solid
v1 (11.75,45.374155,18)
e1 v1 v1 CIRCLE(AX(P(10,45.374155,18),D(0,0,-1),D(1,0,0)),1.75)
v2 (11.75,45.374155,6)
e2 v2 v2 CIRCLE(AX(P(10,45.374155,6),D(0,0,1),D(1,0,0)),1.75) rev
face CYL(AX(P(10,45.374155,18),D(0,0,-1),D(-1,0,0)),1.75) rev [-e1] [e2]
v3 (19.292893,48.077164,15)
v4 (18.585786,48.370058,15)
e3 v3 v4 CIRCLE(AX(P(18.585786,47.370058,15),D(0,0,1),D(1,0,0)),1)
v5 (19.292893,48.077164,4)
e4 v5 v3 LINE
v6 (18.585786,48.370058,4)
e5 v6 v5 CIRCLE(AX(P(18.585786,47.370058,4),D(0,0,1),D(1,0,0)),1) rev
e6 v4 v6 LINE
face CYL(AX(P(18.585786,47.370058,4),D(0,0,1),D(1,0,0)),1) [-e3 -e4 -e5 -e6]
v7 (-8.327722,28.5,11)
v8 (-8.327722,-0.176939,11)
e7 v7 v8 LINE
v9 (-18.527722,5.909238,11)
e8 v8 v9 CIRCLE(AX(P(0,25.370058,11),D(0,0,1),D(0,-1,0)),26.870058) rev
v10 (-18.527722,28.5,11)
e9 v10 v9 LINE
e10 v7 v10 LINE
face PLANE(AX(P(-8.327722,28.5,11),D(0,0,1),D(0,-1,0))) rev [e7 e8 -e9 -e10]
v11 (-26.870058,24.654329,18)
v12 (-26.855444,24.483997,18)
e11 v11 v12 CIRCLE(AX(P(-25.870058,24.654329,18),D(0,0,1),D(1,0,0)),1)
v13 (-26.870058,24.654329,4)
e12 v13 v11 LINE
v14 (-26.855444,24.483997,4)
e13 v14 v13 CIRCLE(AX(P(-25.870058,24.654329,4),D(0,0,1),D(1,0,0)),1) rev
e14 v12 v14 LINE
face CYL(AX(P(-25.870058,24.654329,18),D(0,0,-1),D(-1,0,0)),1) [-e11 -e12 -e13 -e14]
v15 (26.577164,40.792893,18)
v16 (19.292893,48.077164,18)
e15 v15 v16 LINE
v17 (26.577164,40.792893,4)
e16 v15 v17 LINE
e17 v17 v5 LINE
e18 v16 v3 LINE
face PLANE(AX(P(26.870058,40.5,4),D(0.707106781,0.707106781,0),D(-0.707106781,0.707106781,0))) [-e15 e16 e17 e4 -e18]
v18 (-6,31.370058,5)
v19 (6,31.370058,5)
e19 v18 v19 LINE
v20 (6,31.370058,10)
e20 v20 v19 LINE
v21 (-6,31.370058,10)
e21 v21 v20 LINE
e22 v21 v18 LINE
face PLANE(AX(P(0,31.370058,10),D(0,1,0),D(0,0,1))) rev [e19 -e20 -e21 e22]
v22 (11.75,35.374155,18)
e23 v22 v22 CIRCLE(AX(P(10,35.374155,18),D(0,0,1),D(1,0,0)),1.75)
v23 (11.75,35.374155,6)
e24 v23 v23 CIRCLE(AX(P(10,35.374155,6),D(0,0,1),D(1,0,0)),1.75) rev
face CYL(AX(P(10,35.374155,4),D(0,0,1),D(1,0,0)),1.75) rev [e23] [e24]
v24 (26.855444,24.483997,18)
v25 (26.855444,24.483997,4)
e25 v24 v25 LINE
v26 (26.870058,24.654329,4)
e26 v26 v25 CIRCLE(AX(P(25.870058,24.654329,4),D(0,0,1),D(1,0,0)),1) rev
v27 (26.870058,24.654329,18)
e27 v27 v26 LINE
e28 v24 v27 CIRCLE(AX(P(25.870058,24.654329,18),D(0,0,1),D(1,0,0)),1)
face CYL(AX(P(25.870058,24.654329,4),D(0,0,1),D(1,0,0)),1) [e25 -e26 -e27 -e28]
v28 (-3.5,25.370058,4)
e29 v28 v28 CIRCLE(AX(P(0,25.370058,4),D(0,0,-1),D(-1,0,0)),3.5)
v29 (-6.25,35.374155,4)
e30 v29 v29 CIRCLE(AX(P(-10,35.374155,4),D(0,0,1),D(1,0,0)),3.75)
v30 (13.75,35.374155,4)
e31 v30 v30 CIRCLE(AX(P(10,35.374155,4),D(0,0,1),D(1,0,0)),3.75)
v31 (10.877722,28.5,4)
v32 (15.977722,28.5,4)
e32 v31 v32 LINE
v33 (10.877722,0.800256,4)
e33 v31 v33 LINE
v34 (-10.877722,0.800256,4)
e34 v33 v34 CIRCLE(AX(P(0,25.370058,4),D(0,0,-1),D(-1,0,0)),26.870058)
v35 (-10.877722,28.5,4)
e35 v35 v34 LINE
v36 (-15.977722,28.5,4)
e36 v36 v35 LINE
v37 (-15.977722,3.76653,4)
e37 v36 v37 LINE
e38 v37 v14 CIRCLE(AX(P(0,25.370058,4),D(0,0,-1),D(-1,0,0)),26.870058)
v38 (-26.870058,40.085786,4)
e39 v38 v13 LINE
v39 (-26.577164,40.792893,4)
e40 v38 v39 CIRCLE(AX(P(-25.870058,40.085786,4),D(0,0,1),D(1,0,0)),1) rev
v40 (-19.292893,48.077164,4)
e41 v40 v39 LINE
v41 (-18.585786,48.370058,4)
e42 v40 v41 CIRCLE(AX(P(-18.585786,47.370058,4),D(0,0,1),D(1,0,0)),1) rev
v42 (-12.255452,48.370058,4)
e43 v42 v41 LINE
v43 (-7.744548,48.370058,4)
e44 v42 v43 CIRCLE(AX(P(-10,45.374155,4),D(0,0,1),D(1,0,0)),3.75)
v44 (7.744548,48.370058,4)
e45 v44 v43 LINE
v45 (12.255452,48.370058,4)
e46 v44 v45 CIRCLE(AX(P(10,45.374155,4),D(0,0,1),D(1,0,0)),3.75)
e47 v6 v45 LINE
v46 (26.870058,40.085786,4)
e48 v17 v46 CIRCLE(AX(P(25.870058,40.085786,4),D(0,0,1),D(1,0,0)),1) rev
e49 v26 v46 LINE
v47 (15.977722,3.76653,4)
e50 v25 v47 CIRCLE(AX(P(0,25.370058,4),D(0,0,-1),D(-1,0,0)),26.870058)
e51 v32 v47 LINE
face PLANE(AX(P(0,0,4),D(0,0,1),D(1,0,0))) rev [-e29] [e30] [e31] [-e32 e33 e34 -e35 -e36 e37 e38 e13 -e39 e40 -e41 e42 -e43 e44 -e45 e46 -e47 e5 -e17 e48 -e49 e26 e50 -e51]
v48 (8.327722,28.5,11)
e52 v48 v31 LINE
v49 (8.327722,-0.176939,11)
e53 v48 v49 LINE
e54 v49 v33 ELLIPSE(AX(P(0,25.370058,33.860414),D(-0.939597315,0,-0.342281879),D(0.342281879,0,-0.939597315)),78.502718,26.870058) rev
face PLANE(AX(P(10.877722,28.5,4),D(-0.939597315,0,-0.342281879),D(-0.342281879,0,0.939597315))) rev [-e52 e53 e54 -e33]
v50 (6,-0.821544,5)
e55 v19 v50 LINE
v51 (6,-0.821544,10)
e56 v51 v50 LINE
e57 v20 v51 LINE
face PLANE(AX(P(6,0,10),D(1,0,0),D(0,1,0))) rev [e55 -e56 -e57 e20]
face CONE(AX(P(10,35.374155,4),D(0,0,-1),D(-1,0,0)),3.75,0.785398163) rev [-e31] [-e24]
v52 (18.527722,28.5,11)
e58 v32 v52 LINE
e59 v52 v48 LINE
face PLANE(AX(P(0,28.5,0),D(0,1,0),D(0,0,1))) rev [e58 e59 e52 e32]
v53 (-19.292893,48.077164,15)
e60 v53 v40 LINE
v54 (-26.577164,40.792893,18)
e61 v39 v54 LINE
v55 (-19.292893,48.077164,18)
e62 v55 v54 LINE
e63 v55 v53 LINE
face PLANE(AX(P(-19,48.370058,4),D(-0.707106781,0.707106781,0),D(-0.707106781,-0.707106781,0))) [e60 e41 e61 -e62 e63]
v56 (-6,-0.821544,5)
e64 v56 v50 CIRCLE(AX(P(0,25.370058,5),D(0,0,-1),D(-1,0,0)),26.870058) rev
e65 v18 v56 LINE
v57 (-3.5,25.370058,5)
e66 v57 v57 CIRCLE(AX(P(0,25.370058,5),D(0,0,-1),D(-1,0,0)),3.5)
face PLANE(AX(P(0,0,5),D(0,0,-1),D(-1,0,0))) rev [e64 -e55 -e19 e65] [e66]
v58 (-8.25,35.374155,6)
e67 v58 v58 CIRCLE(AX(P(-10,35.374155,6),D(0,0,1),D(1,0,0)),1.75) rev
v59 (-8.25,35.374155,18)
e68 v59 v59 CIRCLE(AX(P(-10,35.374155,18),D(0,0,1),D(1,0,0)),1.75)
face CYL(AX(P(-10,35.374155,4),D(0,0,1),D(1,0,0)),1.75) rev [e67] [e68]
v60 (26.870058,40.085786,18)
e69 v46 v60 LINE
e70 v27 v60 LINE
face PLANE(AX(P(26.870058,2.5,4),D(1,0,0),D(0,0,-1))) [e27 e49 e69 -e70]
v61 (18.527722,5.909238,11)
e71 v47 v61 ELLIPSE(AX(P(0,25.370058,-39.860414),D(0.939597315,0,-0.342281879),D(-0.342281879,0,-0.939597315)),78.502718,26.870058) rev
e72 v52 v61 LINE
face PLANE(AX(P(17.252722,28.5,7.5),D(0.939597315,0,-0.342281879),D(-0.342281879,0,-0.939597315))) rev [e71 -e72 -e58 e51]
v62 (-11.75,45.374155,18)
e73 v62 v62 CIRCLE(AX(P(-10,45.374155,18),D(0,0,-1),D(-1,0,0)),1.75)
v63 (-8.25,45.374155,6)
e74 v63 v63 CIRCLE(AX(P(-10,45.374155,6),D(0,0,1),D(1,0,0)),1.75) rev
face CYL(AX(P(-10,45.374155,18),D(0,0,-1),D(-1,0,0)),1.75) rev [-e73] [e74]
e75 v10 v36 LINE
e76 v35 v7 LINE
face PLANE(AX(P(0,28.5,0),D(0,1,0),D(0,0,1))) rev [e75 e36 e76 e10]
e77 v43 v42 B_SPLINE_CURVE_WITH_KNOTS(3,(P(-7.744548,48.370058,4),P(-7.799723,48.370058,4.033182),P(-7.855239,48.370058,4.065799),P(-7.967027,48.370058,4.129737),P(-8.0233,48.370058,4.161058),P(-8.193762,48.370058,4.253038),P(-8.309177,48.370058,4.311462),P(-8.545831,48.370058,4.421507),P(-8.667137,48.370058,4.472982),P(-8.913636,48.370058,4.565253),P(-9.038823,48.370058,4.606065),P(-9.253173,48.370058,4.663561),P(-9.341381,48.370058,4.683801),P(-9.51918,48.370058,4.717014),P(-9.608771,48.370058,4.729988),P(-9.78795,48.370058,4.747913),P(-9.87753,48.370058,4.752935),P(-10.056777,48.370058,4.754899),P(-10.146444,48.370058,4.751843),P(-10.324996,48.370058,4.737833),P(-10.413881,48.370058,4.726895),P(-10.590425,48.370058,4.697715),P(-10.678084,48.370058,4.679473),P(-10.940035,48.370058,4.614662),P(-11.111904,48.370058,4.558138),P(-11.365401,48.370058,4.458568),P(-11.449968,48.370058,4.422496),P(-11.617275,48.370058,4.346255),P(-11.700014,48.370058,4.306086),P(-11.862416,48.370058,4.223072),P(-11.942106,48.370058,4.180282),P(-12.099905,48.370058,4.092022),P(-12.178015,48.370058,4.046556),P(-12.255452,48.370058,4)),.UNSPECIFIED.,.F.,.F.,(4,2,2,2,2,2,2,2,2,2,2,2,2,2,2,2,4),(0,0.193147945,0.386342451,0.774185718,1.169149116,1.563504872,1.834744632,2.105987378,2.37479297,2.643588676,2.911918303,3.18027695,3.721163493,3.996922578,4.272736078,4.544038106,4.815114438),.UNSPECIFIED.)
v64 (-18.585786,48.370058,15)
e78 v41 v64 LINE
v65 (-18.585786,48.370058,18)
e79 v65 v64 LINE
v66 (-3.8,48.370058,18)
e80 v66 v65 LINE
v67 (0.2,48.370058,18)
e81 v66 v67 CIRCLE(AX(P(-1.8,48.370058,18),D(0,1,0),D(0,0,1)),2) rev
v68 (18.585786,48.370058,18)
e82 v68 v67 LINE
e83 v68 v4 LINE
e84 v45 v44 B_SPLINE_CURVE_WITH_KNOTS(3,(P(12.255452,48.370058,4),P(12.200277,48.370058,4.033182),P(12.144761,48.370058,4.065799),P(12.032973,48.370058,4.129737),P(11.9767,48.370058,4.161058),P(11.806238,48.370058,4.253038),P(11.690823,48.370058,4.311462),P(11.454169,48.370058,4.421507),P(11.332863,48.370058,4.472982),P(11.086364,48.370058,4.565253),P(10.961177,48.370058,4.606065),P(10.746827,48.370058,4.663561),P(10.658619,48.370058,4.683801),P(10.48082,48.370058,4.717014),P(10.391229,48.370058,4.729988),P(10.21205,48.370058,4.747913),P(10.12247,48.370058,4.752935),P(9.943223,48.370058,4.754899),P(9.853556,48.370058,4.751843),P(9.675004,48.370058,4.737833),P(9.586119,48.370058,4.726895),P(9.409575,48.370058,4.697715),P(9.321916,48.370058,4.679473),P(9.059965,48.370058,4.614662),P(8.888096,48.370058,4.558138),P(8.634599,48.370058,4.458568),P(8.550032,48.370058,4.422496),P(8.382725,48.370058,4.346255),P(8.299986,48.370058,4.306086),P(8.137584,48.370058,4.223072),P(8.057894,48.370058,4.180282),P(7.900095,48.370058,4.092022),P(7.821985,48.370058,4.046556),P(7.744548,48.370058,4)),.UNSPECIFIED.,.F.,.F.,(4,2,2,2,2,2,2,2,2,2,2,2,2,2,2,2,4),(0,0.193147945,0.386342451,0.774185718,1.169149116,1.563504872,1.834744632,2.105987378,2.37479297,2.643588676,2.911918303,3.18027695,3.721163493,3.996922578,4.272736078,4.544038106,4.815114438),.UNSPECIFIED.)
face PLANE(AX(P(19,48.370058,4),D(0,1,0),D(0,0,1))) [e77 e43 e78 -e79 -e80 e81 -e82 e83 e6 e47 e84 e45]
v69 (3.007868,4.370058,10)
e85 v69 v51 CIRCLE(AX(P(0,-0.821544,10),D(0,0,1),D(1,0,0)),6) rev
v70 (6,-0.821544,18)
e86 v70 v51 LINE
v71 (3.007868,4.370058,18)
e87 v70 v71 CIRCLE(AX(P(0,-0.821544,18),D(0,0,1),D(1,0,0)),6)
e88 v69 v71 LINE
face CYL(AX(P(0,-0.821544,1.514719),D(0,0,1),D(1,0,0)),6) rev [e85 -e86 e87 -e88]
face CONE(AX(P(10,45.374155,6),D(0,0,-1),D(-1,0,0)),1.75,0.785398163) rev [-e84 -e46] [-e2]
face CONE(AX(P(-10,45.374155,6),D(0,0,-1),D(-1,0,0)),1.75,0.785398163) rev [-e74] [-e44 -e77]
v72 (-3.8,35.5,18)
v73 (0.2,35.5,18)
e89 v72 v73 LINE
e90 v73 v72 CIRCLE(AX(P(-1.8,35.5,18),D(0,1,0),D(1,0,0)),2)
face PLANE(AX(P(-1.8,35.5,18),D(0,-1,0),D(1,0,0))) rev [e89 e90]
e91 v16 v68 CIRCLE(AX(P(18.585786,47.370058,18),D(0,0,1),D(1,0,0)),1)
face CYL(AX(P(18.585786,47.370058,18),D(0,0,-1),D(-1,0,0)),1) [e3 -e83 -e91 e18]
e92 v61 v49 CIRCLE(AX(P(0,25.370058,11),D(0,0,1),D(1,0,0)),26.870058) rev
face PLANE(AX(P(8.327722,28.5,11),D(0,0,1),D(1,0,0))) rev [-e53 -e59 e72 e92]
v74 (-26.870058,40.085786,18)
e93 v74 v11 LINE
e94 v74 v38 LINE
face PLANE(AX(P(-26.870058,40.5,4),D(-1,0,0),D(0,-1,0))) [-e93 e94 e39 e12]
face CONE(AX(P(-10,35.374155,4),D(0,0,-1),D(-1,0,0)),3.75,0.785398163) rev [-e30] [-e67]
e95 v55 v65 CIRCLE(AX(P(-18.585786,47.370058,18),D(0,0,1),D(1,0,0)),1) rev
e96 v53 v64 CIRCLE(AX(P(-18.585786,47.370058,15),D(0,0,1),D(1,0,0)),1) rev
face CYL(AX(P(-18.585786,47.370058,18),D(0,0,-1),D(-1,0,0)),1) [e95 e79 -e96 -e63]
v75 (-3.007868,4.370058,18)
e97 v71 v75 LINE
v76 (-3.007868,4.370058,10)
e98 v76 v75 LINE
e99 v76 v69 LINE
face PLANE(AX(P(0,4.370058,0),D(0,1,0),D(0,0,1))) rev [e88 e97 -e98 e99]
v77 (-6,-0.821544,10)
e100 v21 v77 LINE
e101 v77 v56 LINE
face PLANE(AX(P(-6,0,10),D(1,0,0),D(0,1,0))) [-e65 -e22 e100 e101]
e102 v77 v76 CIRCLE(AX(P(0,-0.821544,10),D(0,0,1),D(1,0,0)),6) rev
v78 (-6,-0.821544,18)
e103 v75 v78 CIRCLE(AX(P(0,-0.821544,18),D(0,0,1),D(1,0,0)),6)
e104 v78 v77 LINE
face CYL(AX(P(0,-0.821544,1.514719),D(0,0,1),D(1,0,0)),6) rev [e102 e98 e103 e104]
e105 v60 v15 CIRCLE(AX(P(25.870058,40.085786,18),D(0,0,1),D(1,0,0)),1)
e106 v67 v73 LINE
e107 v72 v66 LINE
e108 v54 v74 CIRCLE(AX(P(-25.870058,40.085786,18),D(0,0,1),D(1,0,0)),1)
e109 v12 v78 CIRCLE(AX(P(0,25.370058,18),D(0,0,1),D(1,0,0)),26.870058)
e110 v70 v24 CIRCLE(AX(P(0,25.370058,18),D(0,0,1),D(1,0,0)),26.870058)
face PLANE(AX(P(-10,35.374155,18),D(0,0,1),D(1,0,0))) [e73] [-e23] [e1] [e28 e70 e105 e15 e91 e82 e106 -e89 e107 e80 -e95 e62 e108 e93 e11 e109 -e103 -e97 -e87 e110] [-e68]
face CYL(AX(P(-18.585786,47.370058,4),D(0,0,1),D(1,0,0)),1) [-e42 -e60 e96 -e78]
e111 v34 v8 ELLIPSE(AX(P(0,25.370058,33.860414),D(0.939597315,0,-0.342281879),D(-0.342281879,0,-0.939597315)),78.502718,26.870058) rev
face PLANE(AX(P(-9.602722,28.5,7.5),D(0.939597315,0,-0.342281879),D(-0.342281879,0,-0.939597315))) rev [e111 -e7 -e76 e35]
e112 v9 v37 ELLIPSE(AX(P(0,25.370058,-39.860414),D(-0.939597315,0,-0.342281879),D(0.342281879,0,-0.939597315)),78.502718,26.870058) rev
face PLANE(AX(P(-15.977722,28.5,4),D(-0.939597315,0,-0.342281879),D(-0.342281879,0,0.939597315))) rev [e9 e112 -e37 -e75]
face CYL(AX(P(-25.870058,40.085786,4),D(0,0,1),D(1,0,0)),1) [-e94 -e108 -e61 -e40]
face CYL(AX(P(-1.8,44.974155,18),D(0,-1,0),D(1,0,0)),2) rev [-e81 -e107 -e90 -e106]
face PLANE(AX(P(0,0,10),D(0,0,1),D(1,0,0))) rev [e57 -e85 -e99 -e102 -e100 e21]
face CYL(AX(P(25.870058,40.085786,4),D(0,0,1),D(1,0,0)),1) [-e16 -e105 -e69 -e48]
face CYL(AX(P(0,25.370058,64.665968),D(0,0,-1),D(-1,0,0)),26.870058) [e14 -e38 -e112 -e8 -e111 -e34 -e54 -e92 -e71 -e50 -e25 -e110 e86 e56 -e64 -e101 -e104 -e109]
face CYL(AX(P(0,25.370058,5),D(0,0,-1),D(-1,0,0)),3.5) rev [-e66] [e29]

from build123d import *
from build123d.topology import SkipClean

# Parameters (mm, degrees)
CROQUIS3_W                   = 38
CROQUIS3_H                   = 38
SALIENTE_EXTRUIR9_DEPTH      = 1
SALIENTE_EXTRUIR10_START     = -11
SALIENTE_EXTRUIR10_OUTLINE_W = 38
SALIENTE_EXTRUIR10_OUTLINE_H = 38
SALIENTE_EXTRUIR10_DEPTH     = 10
CROQUIS13_W                  = 38
CROQUIS13_H                  = 38
SALIENTE_EXTRUIR15_DEPTH     = 3
CROQUIS14_R                  = 1.75
CORTAR_EXTRUIR1_DEPTH        = 14
CROQUIS15_W                  = 38
CROQUIS15_H                  = 24.129942315
CROQUIS15_R                  = 3.5
SALIENTE_EXTRUIR16_DEPTH     = 1
CORTAR_EXTRUIR2_DEPTH        = 14
SALIENTE_EXTRUIR17_DEPTH     = 5
SALIENTE_EXTRUIR18_DEPTH     = 5
CORTAR_EXTRUIR3_DEPTH        = 3
REDONDEO11_R                 = 1
CROQUIS21_R                  = 1.75
CORTAR_EXTRUIR4_DEPTH        = 11
SALIENTE_EXTRUIR20_START     = 3
CROQUIS22_R                  = 3
CROQUIS22_R_2                = 1.75
SALIENTE_EXTRUIR20_DEPTH     = 3
CHAFL_N1_SIZE                = 2
REDONDEO13_R                 = 1
SALIENTE_EXTRUIR22_DEPTH     = 3
REDONDEO14_R                 = 5
SALIENTE_EXTRUIR25_DEPTH     = 1
SALIENTE_EXTRUIR26_DEPTH     = 13
CROQUIS30_W                  = 12
CROQUIS30_H                  = 8
SALIENTE_EXTRUIR27_DEPTH     = 15
SALIENTE_EXTRUIR28_DEPTH     = 8
CORTAR_EXTRUIR5_DEPTH        = 30
CROQUIS35_R                  = 3
SALIENTE_EXTRUIR29_DEPTH     = 3
CORTAR_EXTRUIR6_DEPTH        = 5


# Read off the part's stored shape, not the designer's step: Saliente-Extruir10
with BuildPart() as part:
    # Croquis3 → Saliente-Extruir9 (new body)
    with BuildSketch(Plane.XY.offset(5)):
        Polygon((19, -5.370057685), (26.870057685, 2.5), (26.870057685, 40.5), (19, 48.370057685), (-19, 48.370057685), (-26.870057685, 40.5), (-26.870057685, 2.5), (-19, -5.370057685), align=None)
        with Locations((0, 21.5)):
            Rectangle(CROQUIS3_W, CROQUIS3_H, mode=Mode.SUBTRACT)
    extrude(amount=-SALIENTE_EXTRUIR9_DEPTH)

    # Saliente-Extruir10 outline → Saliente-Extruir10 (add)
    with BuildSketch(Plane(origin=(0, 0, 4), x_dir=(-1, 0, 0), z_dir=(0, 0, -1)).offset(SALIENTE_EXTRUIR10_START)):
        Polygon((-26.870057685, 2.5), (-19, -5.370057685), (19, -5.370057685), (26.870057685, 2.5), (26.870057685, 40.5), (19, 48.370057685), (-19, 48.370057685), (-26.870057685, 40.5), align=None)
        with Locations((0, 21.5)):
            Rectangle(SALIENTE_EXTRUIR10_OUTLINE_W, SALIENTE_EXTRUIR10_OUTLINE_H, mode=Mode.SUBTRACT)
    extrude(amount=SALIENTE_EXTRUIR10_DEPTH)

    # Croquis13 → Saliente-Extruir15 (add)
    with BuildSketch(Plane.XY.offset(15)):
        with BuildLine():
            Line((-22.5, 44.870057685), (-22.5, -1))
            Line((-22.5, -1), (22.5, -1))
            Line((22.5, -1), (22.5, 44.870057685))
            Line((22.5, 44.870057685), (19.292893219, 48.077164466))
            ThreePointArc((19.292893219, 48.077164466), (18.96846987, 48.293937218), (18.585786438, 48.370057685))
            Line((18.585786438, 48.370057685), (-18.585786438, 48.370057685))
            ThreePointArc((-18.585786438, 48.370057685), (-18.96846987, 48.293937218), (-19.292893219, 48.077164466))
            Line((-19.292893219, 48.077164466), (-22.5, 44.870057685))
        make_face()
        with Locations((0, 21.5)):
            Rectangle(CROQUIS13_W, CROQUIS13_H, mode=Mode.SUBTRACT)
    extrude(amount=SALIENTE_EXTRUIR15_DEPTH)

    # Croquis14 → Cortar-Extruir1 (cut)
    with BuildSketch(Plane(origin=(0, 0, 4), x_dir=(-1, 0, 0), z_dir=(0, 0, -1))):
        with Locations((10, 45.37415474)):
            Circle(CROQUIS14_R)
        with Locations(Location((-10, 45.37415474, 0), (0, 0, 180))):
            Circle(CROQUIS14_R)
    extrude(amount=-CORTAR_EXTRUIR1_DEPTH, mode=Mode.SUBTRACT)

    # Croquis15 → Saliente-Extruir16 (add)
    with BuildSketch(Plane(origin=(0, 0, 4), x_dir=(-1, 0, 0), z_dir=(0, 0, -1))):
        with Locations((0, 28.435028843)):
            Rectangle(CROQUIS15_W, CROQUIS15_H)
        with Locations((0, 25.370057685)):
            Circle(CROQUIS15_R, mode=Mode.SUBTRACT)
    extrude(amount=-SALIENTE_EXTRUIR16_DEPTH)

    # Croquis16 → Cortar-Extruir2 (cut)
    with BuildSketch(Plane(origin=(0, 0, 4), x_dir=(-1, 0, 0), z_dir=(0, 0, -1))):
        Polygon((-19, 2.5), (-19, 16.370057685), (-26.870057685, 24.24011537), (-26.870057685, 2.5), (-19, -5.370057685), (19, -5.370057685), (26.870057685, 2.5), (26.870057685, 24.24011537), (19, 16.370057685), (19, 2.5), align=None)
    extrude(amount=-CORTAR_EXTRUIR2_DEPTH, mode=Mode.SUBTRACT)

    # Croquis17 → Saliente-Extruir17 (add)
    with BuildSketch(Plane.XY.offset(5)):
        Polygon((6, 31.370057685), (6, 25.370057685), (6, 19.370057685), (6, 16.370057685), (19, 16.370057685), (19, 40.5), (-19, 40.5), (-19, 16.370057685), (-6, 16.370057685), (-6, 19.370057685), (-6, 31.370057685), align=None)
    extrude(amount=SALIENTE_EXTRUIR17_DEPTH)

    # Croquis18 → Saliente-Extruir18 (add)
    with BuildSketch(Plane.XY.offset(10)):
        Polygon((-19, 40.5), (-19, 16.370057685), (-6, 16.370057685), (-6, 19.370057685), (6, 19.370057685), (6, 16.370057685), (19, 16.370057685), (19, 40.5), align=None)
    extrude(amount=SALIENTE_EXTRUIR18_DEPTH)

    # Croquis19 → Cortar-Extruir3 (cut)
    with BuildSketch(Plane.XY.offset(18)):
        Polygon((-22.5, 19.870057685), (-19, 16.370057685), (-19, 21.370057685), (-22.5, 21.370057685), align=None)
        Polygon((19, 16.370057685), (22.5, 19.870057685), (22.5, 21.370057685), (19, 21.370057685), align=None)
    extrude(amount=-CORTAR_EXTRUIR3_DEPTH, mode=Mode.SUBTRACT)

    # Redondeo11
    redondeo11_edges = [part.edges().sort_by_distance(p)[0] for p in [
        (26.870057685, 40.5, 10),
        (19, 48.370057685, 10),
        (-19, 48.370057685, 10),
        (-26.870057685, 40.5, 10),
        (26.870057685, 24.24011537, 9.5),
        (19, 16.370057685, 9.5),
        (-26.870057685, 24.24011537, 9.5),
        (-19, 16.370057685, 9.5),
    ]]
    fillet(redondeo11_edges, radius=REDONDEO11_R)

    # Croquis21 → Cortar-Extruir4 (cut)
    with BuildSketch(Plane.XY.offset(15)):
        with Locations((-10, 35.37415474)):
            Circle(CROQUIS21_R)
        with Locations((10, 35.37415474)):
            Circle(CROQUIS21_R)
    extrude(amount=-CORTAR_EXTRUIR4_DEPTH, mode=Mode.SUBTRACT)

    # Croquis22 → Saliente-Extruir20 (add)
    # profile 1 of 2: a face of its own
    with BuildSketch(Plane.XY.offset(15).offset(SALIENTE_EXTRUIR20_START)):
        with Locations(Location((-10, 35.37415474, 0), (0, 0, 180))):
            Circle(CROQUIS22_R)
        with Locations((-10, 35.37415474)):
            Circle(CROQUIS22_R_2, mode=Mode.SUBTRACT)
    # profile 2 of 2: a face of its own
    with BuildSketch(Plane.XY.offset(15).offset(SALIENTE_EXTRUIR20_START)):
        with Locations(Location((10, 35.37415474, 0), (0, 0, 180))):
            Circle(CROQUIS22_R)
        with Locations((10, 35.37415474)):
            Circle(CROQUIS22_R_2, mode=Mode.SUBTRACT)
    extrude(amount=-SALIENTE_EXTRUIR20_DEPTH)

    # Croquis23 → Cortar-Revolución1 (revolve, cut)
    with BuildSketch(Plane.XY.offset(18)):
        Polygon((-1.8, 48.370057685), (-1.8, 44.97415474), (-1.8, 40.5), (0.2, 40.5), (0.2, 48.370057685), align=None)
    revolve(axis=Axis((-1.8, 44.97415474, 18), (0, 1, 0)), mode=Mode.SUBTRACT)

    # Chaflán1
    # the kernel refuses this chamfer: 2 mm, written as the material it takes off along each edge
    with BuildSketch(Plane(origin=(-10, 45.37415474, 4), x_dir=(-1, 0, 0), z_dir=(0, -1, 0))) as chafl_n1_piece_1:
        Polygon((1.75 + CHAFL_N1_SIZE, 0), (1.75, -CHAFL_N1_SIZE), (1.75, 0), align=None)
    revolve(axis=Axis((-10, 45.37415474, 4), (0, 0, -1)), mode=Mode.SUBTRACT)
    with BuildSketch(Plane(origin=(10, 45.37415474, 4), x_dir=(1, 0, 0), z_dir=(0, 1, 0))) as chafl_n1_piece_2:
        Polygon((1.75 + CHAFL_N1_SIZE, 0), (1.75, -CHAFL_N1_SIZE), (1.75, 0), align=None)
    revolve(axis=Axis((10, 45.37415474, 4), (0, 0, -1)), mode=Mode.SUBTRACT)
    with BuildSketch(Plane(origin=(-10, 35.37415474, 4), x_dir=(1, 0, 0), z_dir=(0, -1, 0))) as chafl_n1_piece_3:
        Polygon((1.75 + CHAFL_N1_SIZE, 0), (1.75, CHAFL_N1_SIZE), (1.75, 0), align=None)
    revolve(axis=Axis((-10, 35.37415474, 4), (0, 0, 1)), mode=Mode.SUBTRACT)
    with BuildSketch(Plane(origin=(10, 35.37415474, 4), x_dir=(1, 0, 0), z_dir=(0, -1, 0))) as chafl_n1_piece_4:
        Polygon((1.75 + CHAFL_N1_SIZE, 0), (1.75, CHAFL_N1_SIZE), (1.75, 0), align=None)
    revolve(axis=Axis((10, 35.37415474, 4), (0, 0, 1)), mode=Mode.SUBTRACT)

    # Redondeo13
    redondeo13_edges = [part.edges().sort_by_distance(p)[0] for p in [
        (22.5, 21.370057685, 16.5),
        (19, 21.370057685, 16.5),
        (-19, 21.370057685, 16.5),
        (-22.5, 21.370057685, 16.5),
    ]]
    fillet(redondeo13_edges, radius=REDONDEO13_R)

    # Croquis26 → Saliente-Extruir22 (add)
    with BuildSketch(Plane.XY.offset(15)):
        with BuildLine():
            Line((19, 22.370057685), (-19, 22.370057685))
            ThreePointArc((-19, 22.370057685), (-19.292893219, 21.662950904), (-20, 21.370057685))
            Line((-20, 21.370057685), (-21.5, 21.370057685))
            ThreePointArc((-21.5, 21.370057685), (-22.207106781, 21.662950904), (-22.5, 22.370057685))
            Line((-22.5, 22.370057685), (-22.5, 44.870057685))
            Line((-22.5, 44.870057685), (-26.577164466, 40.792893219))
            ThreePointArc((-26.577164466, 40.792893219), (-26.793937218, 40.46846987), (-26.870057685, 40.085786438))
            Line((-26.870057685, 40.085786438), (-26.870057685, 24.654328933))
            ThreePointArc((-26.870057685, 24.654328933), (-26.793937218, 24.2716455), (-26.577164466, 23.947222151))
            Line((-26.577164466, 23.947222151), (-19.292893219, 16.662950904))
            ThreePointArc((-19.292893219, 16.662950904), (-18.96846987, 16.446178153), (-18.585786438, 16.370057685))
            Line((-18.585786438, 16.370057685), (-6, 16.370057685))
            Line((-6, 16.370057685), (-6, 19.370057685))
            Line((-6, 19.370057685), (6, 19.370057685))
            Line((6, 19.370057685), (6, 16.370057685))
            Line((6, 16.370057685), (18.585786438, 16.370057685))
            ThreePointArc((18.585786438, 16.370057685), (18.96846987, 16.446178153), (19.292893219, 16.662950904))
            Line((19.292893219, 16.662950904), (26.577164466, 23.947222151))
            ThreePointArc((26.577164466, 23.947222151), (26.793937218, 24.2716455), (26.870057685, 24.654328933))
            Line((26.870057685, 24.654328933), (26.870057685, 40.085786438))
            ThreePointArc((26.870057685, 40.085786438), (26.793937218, 40.46846987), (26.577164466, 40.792893219))
            Line((26.577164466, 40.792893219), (22.5, 44.870057685))
            Line((22.5, 44.870057685), (22.5, 22.370057685))
            ThreePointArc((22.5, 22.370057685), (22.207106781, 21.662950904), (21.5, 21.370057685))
            Line((21.5, 21.370057685), (20, 21.370057685))
            ThreePointArc((20, 21.370057685), (19.292893219, 21.662950904), (19, 22.370057685))
        make_face()
    extrude(amount=SALIENTE_EXTRUIR22_DEPTH)

    # Redondeo14
    redondeo14_edges = [part.edges().sort_by_distance(p)[0] for p in [
        (-19, 40.5, 16.5),
        (19, 40.5, 16.5),
        (19, 22.370057685, 16.5),
        (-19, 22.370057685, 16.5),
    ]]
    fillet(redondeo14_edges, radius=REDONDEO14_R)

    # Croquis28 → Saliente-Extruir25 (add)
    with BuildSketch(Plane(origin=(0, 0, 4), x_dir=(-1, 0, 0), z_dir=(0, 0, -1))):
        with BuildLine():
            ThreePointArc((-26.855444452, 24.483997139), (0, -1.5), (26.855444452, 24.483997139))
            ThreePointArc((26.855444452, 24.483997139), (26.757844512, 24.194074057), (26.577164466, 23.947222151))
            Line((26.577164466, 23.947222151), (19.292893219, 16.662950904))
            ThreePointArc((19.292893219, 16.662950904), (18.96846987, 16.446178153), (18.585786438, 16.370057685))
            Line((18.585786438, 16.370057685), (-18.585786438, 16.370057685))
            ThreePointArc((-18.585786438, 16.370057685), (-18.96846987, 16.446178153), (-19.292893219, 16.662950904))
            Line((-19.292893219, 16.662950904), (-26.577164466, 23.947222151))
            ThreePointArc((-26.577164466, 23.947222151), (-26.757844512, 24.194074057), (-26.855444452, 24.483997139))
        make_face()
    extrude(amount=-SALIENTE_EXTRUIR25_DEPTH)

    # Croquis29 → Saliente-Extruir26 (add)
    with BuildSketch(Plane.XY.offset(5)):
        with BuildLine():
            Line((-6, 16.370057685), (-6, -0.821544022))
            ThreePointArc((-6, -0.821544022), (-20.735541008, 8.280957677), (-26.855444452, 24.483997139))
            Line((-26.855444452, 24.483997139), (-6, 16.370057685))
        make_face()
        with BuildLine():
            Line((6, 16.370057685), (6, -0.821544022))
            ThreePointArc((6, -0.821544022), (20.735541008, 8.280957677), (26.855444452, 24.483997139))
            Line((26.855444452, 24.483997139), (6, 16.370057685))
        make_face()
    extrude(amount=SALIENTE_EXTRUIR26_DEPTH)

    # Croquis30 → Saliente-Extruir27 (add)
    with BuildSketch(Plane.XZ.offset(-19.370057685)):
        with Locations((0, 14)):
            Rectangle(CROQUIS30_W, CROQUIS30_H)
    extrude(amount=SALIENTE_EXTRUIR27_DEPTH)

    # Croquis31 → Saliente-Extruir28 (add)
    with BuildSketch(Plane.XY.offset(18)):
        with BuildLine():
            ThreePointArc((-6, -0.821544022), (-4.242640687, 3.421096665), (0, 5.178455978))
            Line((0, 5.178455978), (-6, 5.178455978))
            Line((-6, 5.178455978), (-6, -0.821544022))
        make_face()
        with BuildLine():
            Line((6, 5.178455978), (0, 5.178455978))
            ThreePointArc((0, 5.178455978), (4.242640687, 3.421096665), (6, -0.821544022))
            Line((6, -0.821544022), (6, 5.178455978))
        make_face()
    extrude(amount=-SALIENTE_EXTRUIR28_DEPTH)

    # Croquis34 → Cortar-Extruir5 (cut)
    with BuildSketch(Plane(origin=(0, -1.5, 0), x_dir=(-1, 0, 0), z_dir=(0, -1, 0))):
        Polygon((9.602722226, -7.5), (10.877722226, -4), (15.977722226, -4), (17.252722226, -7.5), (18.527722226, -11), (8.327722226, -11), align=None)
        Polygon((-10.877722226, -4), (-9.602722226, -7.5), (-8.327722226, -11), (-18.527722226, -11), (-17.252722226, -7.5), (-15.977722226, -4), align=None)
    extrude(amount=-CORTAR_EXTRUIR5_DEPTH, mode=Mode.SUBTRACT)

    # Croquis35 → Saliente-Extruir29 (add)
    with BuildSketch(Plane.XY.offset(15)):
        with BuildLine():
            Line((-14, 40.5), (14, 40.5))
            ThreePointArc((14, 40.5), (17.535533906, 39.035533906), (19, 35.5))
            Line((19, 35.5), (19, 27.370057685))
            ThreePointArc((19, 27.370057685), (17.535533906, 23.834523779), (14, 22.370057685))
            Line((14, 22.370057685), (-14, 22.370057685))
            ThreePointArc((-14, 22.370057685), (-17.535533906, 23.834523779), (-19, 27.370057685))
            Line((-19, 27.370057685), (-19, 35.5))
            ThreePointArc((-19, 35.5), (-17.535533906, 39.035533906), (-14, 40.5))
        make_face()
        with Locations((-10, 35.37415474)):
            Circle(CROQUIS35_R, mode=Mode.SUBTRACT)
        with Locations((10, 35.37415474)):
            Circle(CROQUIS35_R, mode=Mode.SUBTRACT)
    extrude(amount=SALIENTE_EXTRUIR29_DEPTH)

    # Croquis36 → Cortar-Extruir6 (cut)
    with SkipClean():  # the faces are left unmerged after this step: merging them gives an invalid solid
        with BuildSketch(Plane(origin=(0, 40.5, 0), x_dir=(1, 0, 0), z_dir=(0, 1, 0))):
            with BuildLine():
                Line((0.2, -18), (-3.8, -18))
                ThreePointArc((-3.8, -18), (-1.8, -16), (0.2, -18))
            make_face()
        extrude(amount=-CORTAR_EXTRUIR6_DEPTH, mode=Mode.SUBTRACT)
    add(part.part.scale(1), mode=Mode.REPLACE)  # the faces are merged on a copy


solid = part.part
